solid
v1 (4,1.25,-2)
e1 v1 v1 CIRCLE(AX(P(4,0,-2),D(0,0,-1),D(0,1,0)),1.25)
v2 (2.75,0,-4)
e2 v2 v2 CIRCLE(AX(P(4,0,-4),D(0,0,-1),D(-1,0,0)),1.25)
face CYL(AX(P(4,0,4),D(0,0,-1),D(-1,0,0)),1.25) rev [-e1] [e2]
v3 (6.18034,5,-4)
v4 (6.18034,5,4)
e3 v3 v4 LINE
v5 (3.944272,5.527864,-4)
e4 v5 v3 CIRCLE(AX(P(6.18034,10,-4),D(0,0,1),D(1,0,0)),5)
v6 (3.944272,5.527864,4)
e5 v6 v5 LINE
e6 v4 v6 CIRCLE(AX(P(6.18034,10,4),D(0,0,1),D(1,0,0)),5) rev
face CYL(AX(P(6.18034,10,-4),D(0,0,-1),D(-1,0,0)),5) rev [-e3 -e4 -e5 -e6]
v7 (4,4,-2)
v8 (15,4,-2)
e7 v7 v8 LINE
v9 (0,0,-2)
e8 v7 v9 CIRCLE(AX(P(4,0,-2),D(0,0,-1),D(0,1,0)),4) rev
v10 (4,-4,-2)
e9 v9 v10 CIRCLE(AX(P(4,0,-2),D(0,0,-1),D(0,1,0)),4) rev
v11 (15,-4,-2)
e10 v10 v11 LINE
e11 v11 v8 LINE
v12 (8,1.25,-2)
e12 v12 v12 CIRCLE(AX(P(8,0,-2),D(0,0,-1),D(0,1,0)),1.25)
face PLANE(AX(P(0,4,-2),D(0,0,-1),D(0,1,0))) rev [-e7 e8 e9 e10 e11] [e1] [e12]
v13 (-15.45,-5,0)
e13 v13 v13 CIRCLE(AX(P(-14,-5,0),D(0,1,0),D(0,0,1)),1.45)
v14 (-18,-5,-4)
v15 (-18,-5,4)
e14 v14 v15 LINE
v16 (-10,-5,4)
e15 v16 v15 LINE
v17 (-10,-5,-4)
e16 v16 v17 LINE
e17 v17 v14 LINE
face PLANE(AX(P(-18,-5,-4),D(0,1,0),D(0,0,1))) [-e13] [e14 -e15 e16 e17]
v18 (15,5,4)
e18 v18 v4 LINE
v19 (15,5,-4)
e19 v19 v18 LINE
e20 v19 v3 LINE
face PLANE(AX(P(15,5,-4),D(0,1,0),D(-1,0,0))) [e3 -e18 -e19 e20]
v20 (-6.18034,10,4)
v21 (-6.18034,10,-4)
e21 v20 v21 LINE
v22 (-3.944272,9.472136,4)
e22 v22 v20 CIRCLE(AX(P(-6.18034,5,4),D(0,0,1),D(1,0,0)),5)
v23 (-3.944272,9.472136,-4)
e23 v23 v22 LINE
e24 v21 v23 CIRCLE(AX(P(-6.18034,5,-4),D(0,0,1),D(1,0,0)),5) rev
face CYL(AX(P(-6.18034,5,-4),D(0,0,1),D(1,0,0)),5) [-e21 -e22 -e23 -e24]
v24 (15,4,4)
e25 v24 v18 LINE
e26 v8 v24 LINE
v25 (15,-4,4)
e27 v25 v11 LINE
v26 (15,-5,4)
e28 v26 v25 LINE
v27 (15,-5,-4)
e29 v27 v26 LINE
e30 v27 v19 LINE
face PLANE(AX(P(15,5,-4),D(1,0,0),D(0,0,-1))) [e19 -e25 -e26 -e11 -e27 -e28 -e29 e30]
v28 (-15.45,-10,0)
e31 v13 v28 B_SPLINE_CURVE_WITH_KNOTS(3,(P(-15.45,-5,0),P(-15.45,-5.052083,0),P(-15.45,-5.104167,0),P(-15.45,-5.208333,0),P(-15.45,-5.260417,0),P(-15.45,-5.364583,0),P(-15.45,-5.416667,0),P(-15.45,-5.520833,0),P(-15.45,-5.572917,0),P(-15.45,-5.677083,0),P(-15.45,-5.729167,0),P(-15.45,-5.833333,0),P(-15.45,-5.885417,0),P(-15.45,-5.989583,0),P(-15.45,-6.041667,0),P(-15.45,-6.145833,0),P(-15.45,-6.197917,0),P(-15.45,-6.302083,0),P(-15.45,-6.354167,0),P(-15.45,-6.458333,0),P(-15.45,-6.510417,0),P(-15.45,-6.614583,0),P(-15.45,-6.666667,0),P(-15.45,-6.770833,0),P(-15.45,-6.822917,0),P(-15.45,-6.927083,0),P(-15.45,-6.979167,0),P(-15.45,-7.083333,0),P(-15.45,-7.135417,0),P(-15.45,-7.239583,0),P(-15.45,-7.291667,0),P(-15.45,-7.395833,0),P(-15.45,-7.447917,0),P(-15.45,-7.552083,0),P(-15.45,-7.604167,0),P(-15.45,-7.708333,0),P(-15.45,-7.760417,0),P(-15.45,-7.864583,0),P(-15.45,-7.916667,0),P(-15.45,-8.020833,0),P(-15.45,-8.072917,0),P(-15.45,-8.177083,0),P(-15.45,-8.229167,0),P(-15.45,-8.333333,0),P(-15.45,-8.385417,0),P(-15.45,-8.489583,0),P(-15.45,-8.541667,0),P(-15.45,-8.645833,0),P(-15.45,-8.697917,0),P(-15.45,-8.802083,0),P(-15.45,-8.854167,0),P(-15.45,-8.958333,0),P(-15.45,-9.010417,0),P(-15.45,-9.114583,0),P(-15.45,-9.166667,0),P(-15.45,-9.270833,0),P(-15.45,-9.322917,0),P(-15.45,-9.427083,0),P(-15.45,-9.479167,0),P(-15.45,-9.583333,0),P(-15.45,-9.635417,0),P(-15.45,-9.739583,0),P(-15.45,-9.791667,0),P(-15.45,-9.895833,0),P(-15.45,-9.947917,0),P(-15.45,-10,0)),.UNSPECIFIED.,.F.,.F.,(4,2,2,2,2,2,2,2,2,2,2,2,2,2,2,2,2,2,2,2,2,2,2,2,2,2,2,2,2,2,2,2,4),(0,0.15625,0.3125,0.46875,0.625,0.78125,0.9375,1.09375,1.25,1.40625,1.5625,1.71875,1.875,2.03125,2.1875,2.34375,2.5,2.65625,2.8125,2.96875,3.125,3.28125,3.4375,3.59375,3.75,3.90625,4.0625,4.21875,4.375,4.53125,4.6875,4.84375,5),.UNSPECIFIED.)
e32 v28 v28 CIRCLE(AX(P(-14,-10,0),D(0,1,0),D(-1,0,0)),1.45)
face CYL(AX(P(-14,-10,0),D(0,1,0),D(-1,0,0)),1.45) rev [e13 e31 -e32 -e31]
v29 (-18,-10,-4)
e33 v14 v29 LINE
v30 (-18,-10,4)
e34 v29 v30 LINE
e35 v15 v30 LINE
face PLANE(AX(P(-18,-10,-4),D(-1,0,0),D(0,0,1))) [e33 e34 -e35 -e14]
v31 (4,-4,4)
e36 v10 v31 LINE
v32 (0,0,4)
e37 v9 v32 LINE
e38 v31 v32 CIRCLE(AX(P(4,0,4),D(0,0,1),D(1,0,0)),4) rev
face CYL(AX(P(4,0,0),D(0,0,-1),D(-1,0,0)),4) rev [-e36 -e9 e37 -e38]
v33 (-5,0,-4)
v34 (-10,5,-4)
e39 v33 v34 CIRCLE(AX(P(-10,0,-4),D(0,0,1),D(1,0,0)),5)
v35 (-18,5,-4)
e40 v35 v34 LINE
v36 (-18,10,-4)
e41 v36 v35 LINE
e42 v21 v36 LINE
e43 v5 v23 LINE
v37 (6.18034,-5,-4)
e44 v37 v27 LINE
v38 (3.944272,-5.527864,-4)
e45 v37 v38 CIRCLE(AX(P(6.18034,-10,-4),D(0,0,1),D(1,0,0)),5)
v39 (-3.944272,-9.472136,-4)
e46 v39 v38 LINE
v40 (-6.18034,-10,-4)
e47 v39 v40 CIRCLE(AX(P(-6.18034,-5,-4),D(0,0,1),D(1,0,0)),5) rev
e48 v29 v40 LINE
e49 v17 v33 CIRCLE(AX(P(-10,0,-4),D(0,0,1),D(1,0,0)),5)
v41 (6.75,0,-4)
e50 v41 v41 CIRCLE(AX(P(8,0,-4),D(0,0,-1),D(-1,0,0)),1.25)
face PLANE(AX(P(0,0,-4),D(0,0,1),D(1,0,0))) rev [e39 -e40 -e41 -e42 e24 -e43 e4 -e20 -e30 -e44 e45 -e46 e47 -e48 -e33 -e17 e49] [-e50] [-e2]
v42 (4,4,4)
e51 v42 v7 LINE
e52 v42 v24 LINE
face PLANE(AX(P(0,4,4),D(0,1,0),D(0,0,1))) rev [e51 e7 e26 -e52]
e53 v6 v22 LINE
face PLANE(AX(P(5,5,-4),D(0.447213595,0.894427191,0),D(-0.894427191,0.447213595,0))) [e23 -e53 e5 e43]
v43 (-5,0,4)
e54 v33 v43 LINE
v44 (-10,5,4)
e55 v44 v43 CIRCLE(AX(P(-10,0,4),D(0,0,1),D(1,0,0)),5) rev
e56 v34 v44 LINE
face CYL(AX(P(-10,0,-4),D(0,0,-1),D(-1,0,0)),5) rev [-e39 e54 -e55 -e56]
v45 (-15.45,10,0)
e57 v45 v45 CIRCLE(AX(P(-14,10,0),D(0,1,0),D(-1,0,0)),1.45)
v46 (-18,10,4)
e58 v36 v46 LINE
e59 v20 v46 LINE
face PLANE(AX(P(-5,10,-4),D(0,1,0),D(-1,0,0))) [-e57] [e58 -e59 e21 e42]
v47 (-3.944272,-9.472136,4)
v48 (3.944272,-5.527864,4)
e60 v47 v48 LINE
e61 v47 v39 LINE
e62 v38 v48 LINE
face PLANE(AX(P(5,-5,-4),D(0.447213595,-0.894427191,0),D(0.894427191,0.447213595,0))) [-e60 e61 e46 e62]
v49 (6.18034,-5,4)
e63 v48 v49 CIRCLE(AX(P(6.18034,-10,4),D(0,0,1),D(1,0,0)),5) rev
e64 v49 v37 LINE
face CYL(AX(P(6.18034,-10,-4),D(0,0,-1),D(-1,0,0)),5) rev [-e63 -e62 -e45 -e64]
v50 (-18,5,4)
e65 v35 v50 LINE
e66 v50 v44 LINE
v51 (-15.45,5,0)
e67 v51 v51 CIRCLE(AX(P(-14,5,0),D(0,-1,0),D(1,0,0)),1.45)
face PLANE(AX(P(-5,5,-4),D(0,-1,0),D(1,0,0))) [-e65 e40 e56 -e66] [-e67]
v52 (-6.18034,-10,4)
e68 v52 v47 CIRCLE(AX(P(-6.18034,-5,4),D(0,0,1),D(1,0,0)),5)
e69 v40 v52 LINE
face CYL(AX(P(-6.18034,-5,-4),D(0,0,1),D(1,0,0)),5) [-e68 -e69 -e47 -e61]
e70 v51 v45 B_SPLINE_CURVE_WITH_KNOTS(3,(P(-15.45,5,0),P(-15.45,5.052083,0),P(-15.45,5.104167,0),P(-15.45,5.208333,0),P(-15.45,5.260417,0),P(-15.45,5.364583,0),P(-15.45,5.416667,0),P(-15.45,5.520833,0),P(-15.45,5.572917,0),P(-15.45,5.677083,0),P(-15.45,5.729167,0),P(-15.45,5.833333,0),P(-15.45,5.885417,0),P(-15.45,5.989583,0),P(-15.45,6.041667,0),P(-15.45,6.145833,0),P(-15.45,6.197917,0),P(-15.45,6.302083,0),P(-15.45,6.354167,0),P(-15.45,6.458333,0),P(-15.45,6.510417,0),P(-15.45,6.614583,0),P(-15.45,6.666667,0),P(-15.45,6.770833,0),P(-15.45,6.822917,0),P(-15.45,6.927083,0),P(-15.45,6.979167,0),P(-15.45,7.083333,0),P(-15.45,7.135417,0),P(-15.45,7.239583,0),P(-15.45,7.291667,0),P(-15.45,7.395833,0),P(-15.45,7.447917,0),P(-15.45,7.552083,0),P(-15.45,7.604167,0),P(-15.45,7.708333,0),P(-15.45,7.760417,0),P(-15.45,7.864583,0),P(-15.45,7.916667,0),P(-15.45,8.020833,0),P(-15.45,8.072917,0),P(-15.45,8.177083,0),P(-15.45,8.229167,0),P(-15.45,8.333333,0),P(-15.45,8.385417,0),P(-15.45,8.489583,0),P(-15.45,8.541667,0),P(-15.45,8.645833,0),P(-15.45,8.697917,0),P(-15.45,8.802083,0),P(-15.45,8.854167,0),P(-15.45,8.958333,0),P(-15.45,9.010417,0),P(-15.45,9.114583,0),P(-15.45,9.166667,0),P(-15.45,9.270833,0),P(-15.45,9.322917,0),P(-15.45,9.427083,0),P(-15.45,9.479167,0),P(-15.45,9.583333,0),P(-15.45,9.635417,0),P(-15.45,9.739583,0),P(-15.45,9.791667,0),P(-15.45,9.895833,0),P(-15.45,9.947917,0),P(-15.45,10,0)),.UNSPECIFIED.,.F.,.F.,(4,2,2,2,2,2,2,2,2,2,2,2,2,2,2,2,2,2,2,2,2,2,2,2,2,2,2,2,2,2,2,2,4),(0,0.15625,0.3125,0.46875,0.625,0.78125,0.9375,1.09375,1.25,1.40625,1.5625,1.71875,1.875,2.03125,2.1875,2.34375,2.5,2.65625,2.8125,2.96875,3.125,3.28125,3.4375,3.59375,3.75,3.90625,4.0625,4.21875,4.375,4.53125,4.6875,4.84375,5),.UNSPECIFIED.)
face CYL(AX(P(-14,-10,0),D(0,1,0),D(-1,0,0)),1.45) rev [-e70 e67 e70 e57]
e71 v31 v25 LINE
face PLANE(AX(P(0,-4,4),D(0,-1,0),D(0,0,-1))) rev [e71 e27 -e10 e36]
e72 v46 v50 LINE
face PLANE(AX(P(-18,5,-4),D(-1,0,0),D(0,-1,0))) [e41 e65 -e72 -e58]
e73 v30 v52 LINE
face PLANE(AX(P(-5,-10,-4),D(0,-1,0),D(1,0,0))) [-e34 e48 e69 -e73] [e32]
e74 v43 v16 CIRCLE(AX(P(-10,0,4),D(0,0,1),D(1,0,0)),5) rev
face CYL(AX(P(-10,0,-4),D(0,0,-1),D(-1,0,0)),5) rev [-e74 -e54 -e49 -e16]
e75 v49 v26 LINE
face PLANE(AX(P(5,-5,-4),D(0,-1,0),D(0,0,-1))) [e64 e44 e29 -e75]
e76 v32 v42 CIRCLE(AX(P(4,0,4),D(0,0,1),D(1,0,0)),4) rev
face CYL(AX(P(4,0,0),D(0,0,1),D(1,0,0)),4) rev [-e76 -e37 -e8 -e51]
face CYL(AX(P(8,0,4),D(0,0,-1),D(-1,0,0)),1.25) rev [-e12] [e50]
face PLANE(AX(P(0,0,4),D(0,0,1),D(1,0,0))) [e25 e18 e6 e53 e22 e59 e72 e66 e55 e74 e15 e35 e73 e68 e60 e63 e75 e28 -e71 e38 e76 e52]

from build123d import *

# Parameters (mm, degrees)
BOSS_EXTRUDE1_DEPTH = 4
SKETCH3_W           = 6
SKETCH3_H           = 8
CUT_EXTRUDE1_DEPTH  = 15
FILLET1_R           = 4
SKETCH4_R           = 1.25
CUT_EXTRUDE2_DEPTH  = 23.090722034
FILLET2_R           = 5
FILLET3_R           = 5
SKETCH6_R           = 1.45
CUT_EXTRUDE3_DEPTH  = 28.202941017


with BuildPart() as part:
    # Sketch1 → Boss-Extrude1 (new, symmetric)
    with BuildSketch(Plane.XY):
        Polygon((15, 5), (15, -5), (5, -5), (-5, -10), (-18, -10), (-18, -5), (-5, -5), (-5, 5), (-18, 5), (-18, 10), (-5, 10), (5, 5), align=None)
    extrude(amount=BOSS_EXTRUDE1_DEPTH, both=True)

    # Sketch3 → Cut-Extrude1 (cut)
    with BuildSketch(Plane(origin=(15, 0, 0), x_dir=(0, 0, -1), z_dir=(1, 0, 0))):
        with Locations((-1, 0)):
            Rectangle(SKETCH3_W, SKETCH3_H)
    extrude(amount=-CUT_EXTRUDE1_DEPTH, mode=Mode.SUBTRACT)

    # Fillet1
    fillet1_edges = [part.edges().sort_by_distance(p)[0] for p in [
        (0, -4, 1),
        (0, 4, 1),
    ]]
    fillet(fillet1_edges, radius=FILLET1_R - 0.0001)  # a hair under: the kernel refuses the full size

    # Sketch4 → Cut-Extrude2 (cut, through all)
    with BuildSketch(Plane(origin=(0, 0, -4), x_dir=(-1, 0, 0), z_dir=(0, 0, -1))):
        with Locations((-4, 0)):
            Circle(SKETCH4_R)
        with Locations((-8, 0)):
            Circle(SKETCH4_R)
    extrude(amount=-CUT_EXTRUDE2_DEPTH, mode=Mode.SUBTRACT)

    # Fillet2
    fillet2_edges = [part.edges().sort_by_distance(p)[0] for p in [
        (-5, 5, 0),
        (-5, -5, 0),
    ]]
    fillet(fillet2_edges, radius=FILLET2_R - 0.0001)  # a hair under: the kernel refuses the full size

    # Fillet3
    fillet3_edges = [part.edges().sort_by_distance(p)[0] for p in [
        (-5, 10, 0),
        (5, 5, 0),
        (5, -5, 0),
        (-5, -10, 0),
    ]]
    fillet(fillet3_edges, radius=FILLET3_R)

    # Sketch6 → Cut-Extrude3 (cut, through all)
    with BuildSketch(Plane(origin=(0, 10, 0), x_dir=(1, 0, 0), z_dir=(0, 1, 0))):
        with Locations(Location((-14, 0, 0), (0, 0, 180))):
            Circle(SKETCH6_R)
    extrude(amount=-CUT_EXTRUDE3_DEPTH, mode=Mode.SUBTRACT)


solid = part.part
